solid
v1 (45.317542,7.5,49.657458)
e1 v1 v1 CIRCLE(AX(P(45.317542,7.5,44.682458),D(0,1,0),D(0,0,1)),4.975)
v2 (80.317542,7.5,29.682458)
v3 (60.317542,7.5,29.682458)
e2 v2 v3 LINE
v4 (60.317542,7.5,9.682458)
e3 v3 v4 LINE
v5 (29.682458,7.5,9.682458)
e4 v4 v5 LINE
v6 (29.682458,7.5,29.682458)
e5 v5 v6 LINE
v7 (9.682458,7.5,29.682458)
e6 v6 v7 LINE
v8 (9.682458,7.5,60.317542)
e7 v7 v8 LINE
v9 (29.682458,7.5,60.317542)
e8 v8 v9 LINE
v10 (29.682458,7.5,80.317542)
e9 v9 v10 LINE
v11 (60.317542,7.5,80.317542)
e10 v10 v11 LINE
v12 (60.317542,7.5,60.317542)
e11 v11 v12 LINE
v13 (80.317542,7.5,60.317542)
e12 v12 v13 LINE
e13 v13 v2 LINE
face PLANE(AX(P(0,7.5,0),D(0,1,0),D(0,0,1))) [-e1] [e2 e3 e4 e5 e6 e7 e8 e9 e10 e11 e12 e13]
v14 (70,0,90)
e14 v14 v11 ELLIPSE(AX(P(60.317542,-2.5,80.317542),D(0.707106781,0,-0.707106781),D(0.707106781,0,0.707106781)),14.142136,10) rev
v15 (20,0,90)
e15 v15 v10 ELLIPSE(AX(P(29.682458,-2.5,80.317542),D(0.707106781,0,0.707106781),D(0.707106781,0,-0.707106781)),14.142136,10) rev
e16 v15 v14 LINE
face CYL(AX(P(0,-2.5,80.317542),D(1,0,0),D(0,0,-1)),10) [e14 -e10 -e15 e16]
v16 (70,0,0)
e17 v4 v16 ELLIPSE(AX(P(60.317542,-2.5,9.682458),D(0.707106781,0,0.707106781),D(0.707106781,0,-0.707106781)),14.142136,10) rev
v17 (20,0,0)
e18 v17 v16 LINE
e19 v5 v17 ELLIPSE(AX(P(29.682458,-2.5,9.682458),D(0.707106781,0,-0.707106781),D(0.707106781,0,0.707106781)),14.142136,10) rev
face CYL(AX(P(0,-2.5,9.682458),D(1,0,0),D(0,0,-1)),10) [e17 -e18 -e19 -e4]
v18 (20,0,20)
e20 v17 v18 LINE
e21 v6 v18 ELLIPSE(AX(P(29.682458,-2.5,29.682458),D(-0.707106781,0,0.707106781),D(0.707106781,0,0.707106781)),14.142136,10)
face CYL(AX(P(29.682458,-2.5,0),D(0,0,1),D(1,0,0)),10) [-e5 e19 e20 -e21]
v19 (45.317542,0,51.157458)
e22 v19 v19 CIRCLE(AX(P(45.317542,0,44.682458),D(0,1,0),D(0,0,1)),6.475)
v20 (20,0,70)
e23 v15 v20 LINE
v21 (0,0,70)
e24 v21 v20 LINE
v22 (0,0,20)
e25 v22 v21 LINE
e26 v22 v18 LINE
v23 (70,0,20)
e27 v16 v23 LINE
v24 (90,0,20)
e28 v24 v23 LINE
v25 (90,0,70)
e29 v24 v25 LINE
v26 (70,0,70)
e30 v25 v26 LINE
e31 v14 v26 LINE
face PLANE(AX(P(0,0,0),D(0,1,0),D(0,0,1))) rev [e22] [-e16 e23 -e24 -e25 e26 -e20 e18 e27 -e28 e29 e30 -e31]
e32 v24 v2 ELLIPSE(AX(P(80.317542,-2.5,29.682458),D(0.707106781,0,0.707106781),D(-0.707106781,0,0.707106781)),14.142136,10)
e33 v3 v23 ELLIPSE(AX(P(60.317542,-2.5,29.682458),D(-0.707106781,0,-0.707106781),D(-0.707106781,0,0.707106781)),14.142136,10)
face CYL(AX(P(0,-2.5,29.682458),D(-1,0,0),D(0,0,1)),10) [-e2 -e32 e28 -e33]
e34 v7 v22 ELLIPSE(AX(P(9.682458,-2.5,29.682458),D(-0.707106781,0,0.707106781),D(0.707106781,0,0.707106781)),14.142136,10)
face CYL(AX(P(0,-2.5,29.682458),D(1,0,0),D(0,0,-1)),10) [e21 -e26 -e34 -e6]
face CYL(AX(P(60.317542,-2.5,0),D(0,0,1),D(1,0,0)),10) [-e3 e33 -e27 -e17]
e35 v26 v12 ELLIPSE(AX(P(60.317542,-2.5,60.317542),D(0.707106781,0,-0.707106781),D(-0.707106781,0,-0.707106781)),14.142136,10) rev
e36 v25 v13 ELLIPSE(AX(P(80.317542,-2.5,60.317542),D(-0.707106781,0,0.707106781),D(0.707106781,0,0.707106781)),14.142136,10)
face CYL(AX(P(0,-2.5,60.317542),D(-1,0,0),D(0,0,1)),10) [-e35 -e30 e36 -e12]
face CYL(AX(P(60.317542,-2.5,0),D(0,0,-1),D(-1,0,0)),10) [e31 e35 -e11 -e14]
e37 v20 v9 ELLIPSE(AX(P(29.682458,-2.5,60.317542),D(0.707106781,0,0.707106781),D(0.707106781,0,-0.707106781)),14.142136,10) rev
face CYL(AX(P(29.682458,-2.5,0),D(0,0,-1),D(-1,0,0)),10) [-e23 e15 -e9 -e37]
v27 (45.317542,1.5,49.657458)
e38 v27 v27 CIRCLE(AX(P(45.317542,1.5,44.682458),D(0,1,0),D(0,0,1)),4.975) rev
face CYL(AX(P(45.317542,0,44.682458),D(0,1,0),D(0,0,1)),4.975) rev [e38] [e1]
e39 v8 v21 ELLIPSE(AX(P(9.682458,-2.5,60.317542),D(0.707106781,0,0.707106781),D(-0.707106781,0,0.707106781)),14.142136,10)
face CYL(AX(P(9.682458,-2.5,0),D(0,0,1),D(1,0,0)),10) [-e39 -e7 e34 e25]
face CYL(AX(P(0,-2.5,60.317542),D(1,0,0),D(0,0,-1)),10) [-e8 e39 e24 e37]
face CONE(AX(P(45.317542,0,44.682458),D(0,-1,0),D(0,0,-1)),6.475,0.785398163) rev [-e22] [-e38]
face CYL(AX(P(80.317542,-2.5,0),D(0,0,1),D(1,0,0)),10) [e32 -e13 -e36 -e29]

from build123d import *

# Parameters (mm, degrees)
BOSS_EXTRUDE1_DEPTH = 7.5
FILLET1_R           = 10
SKETCH2_R           = 4.975
CUT_EXTRUDE1_DEPTH  = 7.5
CHAMFER1_SIZE       = 1.5


with BuildPart() as part:
    # Sketch1 → Boss-Extrude1 (new body)
    with BuildSketch(Plane(origin=(0, 0, 0), x_dir=(1, 0, 0), z_dir=(0, 1, 0))):
        Polygon((70, 0), (20, 0), (20, -20), (0, -20), (0, -70), (20, -70), (20, -90), (70, -90), (70, -70), (90, -70), (90, -20), (70, -20), align=None)
    extrude(amount=BOSS_EXTRUDE1_DEPTH)

    # Fillet1
    # the kernel refuses this fillet: 10 mm, written as the material it takes off along each edge
    with BuildSketch(Plane(origin=(-24.206145914, 7.5, 70), x_dir=(0, -1, 0), z_dir=(1, 0, 0)), Plane(origin=(20, 7.5, 70), x_dir=(0, -1, 0), z_dir=(0, 0, 1)), Plane(origin=(70, 7.5, 114.206145914), x_dir=(0, -1, 0), z_dir=(0, 0, -1)), Plane(origin=(70, 7.5, 70), x_dir=(0, -1, 0), z_dir=(1, 0, 0)), Plane(origin=(114.206145914, 7.5, 20), x_dir=(0, -1, 0), z_dir=(-1, 0, 0)), Plane(origin=(70, 7.5, 20), x_dir=(0, -1, 0), z_dir=(0, 0, -1)), Plane(origin=(20, 7.5, -24.206145914), x_dir=(0, -1, 0), z_dir=(0, 0, 1)), Plane(origin=(20, 7.5, 20), x_dir=(0, -1, 0), z_dir=(-1, 0, 0))) as fillet1_piece_1:
        with BuildLine():
            CenterArc((10, 9.682458366), FILLET1_R, 180, 75.522487814)
            Line((0, 9.682458366), (-0.2, 9.682458366))
            Line((-0.2, 9.682458366), (-0.2, 0))
            Line((-0.2, 0), (0, -0.2))
            ThreePointArc((0, -0.2), (3.75, -0.2), (7.45, -0.193649167))
            Line((7.45, -0.193649167), (7.5, 0))
        make_face()
    extrude(amount=44.206145914, mode=Mode.SUBTRACT)
    with BuildSketch(Plane(origin=(-4.206145914, 7.5, 90), x_dir=(0, -1, 0), z_dir=(1, 0, 0)), Plane(origin=(90, 7.5, 94.206145914), x_dir=(0, -1, 0), z_dir=(0, 0, -1)), Plane(origin=(94.206145914, 7.5, 0), x_dir=(0, -1, 0), z_dir=(-1, 0, 0)), Plane(origin=(0, 7.5, -4.206145914), x_dir=(0, -1, 0), z_dir=(0, 0, 1))) as fillet1_piece_2:
        with BuildLine():
            CenterArc((10, 9.682458366), FILLET1_R, 180, 75.522487814)
            Line((0, 9.682458366), (-0.2, 9.682458366))
            Line((-0.2, 9.682458366), (-0.2, 0))
            Line((-0.2, 0), (0, -0.2))
            ThreePointArc((0, -0.2), (3.75, -0.2), (7.45, -0.193649167))
            Line((7.45, -0.193649167), (7.5, 0))
        make_face()
    extrude(amount=98.412291828, mode=Mode.SUBTRACT)
    with BuildSketch(Plane(origin=(-24.206145914, 7.5, 70), x_dir=(0, -1, 0), z_dir=(1, 0, 0))) as fillet1_piece_3a_section:
        with BuildLine():
            CenterArc((10, 9.682458366), FILLET1_R, 180, 75.522487814)
            Line((0, 9.682458366), (-0.2, 9.682458366))
            Line((-0.2, 9.682458366), (-0.2, 0))
            Line((-0.2, 0), (0, -0.2))
            ThreePointArc((0, -0.2), (3.75, -0.2), (7.45, -0.193649167))
            Line((7.45, -0.193649167), (7.5, 0))
        make_face()
    fillet1_piece_3a = extrude(amount=68.412291828, mode=Mode.PRIVATE)
    fillet1_piece_3a = split(fillet1_piece_3a, bisect_by=Plane(origin=(20, 5.604082443, 67.718558992), z_dir=(1, 0, 0)), keep=Keep.TOP, mode=Mode.PRIVATE)
    with BuildSketch(Plane(origin=(20, 7.5, 45.793854086), x_dir=(0, -1, 0), z_dir=(0, 0, 1))) as fillet1_piece_3b_section:
        with BuildLine():
            CenterArc((10, 9.682458366), FILLET1_R, 180, 75.522487814)
            Line((0, 9.682458366), (-0.2, 9.682458366))
            Line((-0.2, 9.682458366), (-0.2, 0))
            Line((-0.2, 0), (0, -0.2))
            ThreePointArc((0, -0.2), (3.75, -0.2), (7.45, -0.193649167))
            Line((7.45, -0.193649167), (7.5, 0))
        make_face()
    fillet1_piece_3b = extrude(amount=68.412291828, mode=Mode.PRIVATE)
    fillet1_piece_3b = split(fillet1_piece_3b, bisect_by=Plane(origin=(22.281441008, 5.604082443, 70), z_dir=(0, 0, -1)), keep=Keep.TOP, mode=Mode.PRIVATE)
    fillet1_piece_3 = fillet1_piece_3a & fillet1_piece_3b
    add(fillet1_piece_3, mode=Mode.SUBTRACT)
    with BuildSketch(Plane(origin=(70, 7.5, 114.206145914), x_dir=(0, -1, 0), z_dir=(0, 0, -1))) as fillet1_piece_4a_section:
        with BuildLine():
            CenterArc((10, 9.682458366), FILLET1_R, 180, 75.522487814)
            Line((0, 9.682458366), (-0.2, 9.682458366))
            Line((-0.2, 9.682458366), (-0.2, 0))
            Line((-0.2, 0), (0, -0.2))
            ThreePointArc((0, -0.2), (3.75, -0.2), (7.45, -0.193649167))
            Line((7.45, -0.193649167), (7.5, 0))
        make_face()
    fillet1_piece_4a = extrude(amount=68.412291828, mode=Mode.PRIVATE)
    fillet1_piece_4a = split(fillet1_piece_4a, bisect_by=Plane(origin=(67.718558992, 5.604082443, 70), z_dir=(0, 0, -1)), keep=Keep.TOP, mode=Mode.PRIVATE)
    with BuildSketch(Plane(origin=(45.793854086, 7.5, 70), x_dir=(0, -1, 0), z_dir=(1, 0, 0))) as fillet1_piece_4b_section:
        with BuildLine():
            CenterArc((10, 9.682458366), FILLET1_R, 180, 75.522487814)
            Line((0, 9.682458366), (-0.2, 9.682458366))
            Line((-0.2, 9.682458366), (-0.2, 0))
            Line((-0.2, 0), (0, -0.2))
            ThreePointArc((0, -0.2), (3.75, -0.2), (7.45, -0.193649167))
            Line((7.45, -0.193649167), (7.5, 0))
        make_face()
    fillet1_piece_4b = extrude(amount=68.412291828, mode=Mode.PRIVATE)
    fillet1_piece_4b = split(fillet1_piece_4b, bisect_by=Plane(origin=(70, 5.604082443, 67.718558992), z_dir=(-1, 0, 0)), keep=Keep.TOP, mode=Mode.PRIVATE)
    fillet1_piece_4 = fillet1_piece_4a & fillet1_piece_4b
    add(fillet1_piece_4, mode=Mode.SUBTRACT)
    with BuildSketch(Plane(origin=(114.206145914, 7.5, 20), x_dir=(0, -1, 0), z_dir=(-1, 0, 0))) as fillet1_piece_5a_section:
        with BuildLine():
            CenterArc((10, 9.682458366), FILLET1_R, 180, 75.522487814)
            Line((0, 9.682458366), (-0.2, 9.682458366))
            Line((-0.2, 9.682458366), (-0.2, 0))
            Line((-0.2, 0), (0, -0.2))
            ThreePointArc((0, -0.2), (3.75, -0.2), (7.45, -0.193649167))
            Line((7.45, -0.193649167), (7.5, 0))
        make_face()
    fillet1_piece_5a = extrude(amount=68.412291828, mode=Mode.PRIVATE)
    fillet1_piece_5a = split(fillet1_piece_5a, bisect_by=Plane(origin=(70, 5.604082443, 22.281441008), z_dir=(-1, 0, 0)), keep=Keep.TOP, mode=Mode.PRIVATE)
    with BuildSketch(Plane(origin=(70, 7.5, 44.206145914), x_dir=(0, -1, 0), z_dir=(0, 0, -1))) as fillet1_piece_5b_section:
        with BuildLine():
            CenterArc((10, 9.682458366), FILLET1_R, 180, 75.522487814)
            Line((0, 9.682458366), (-0.2, 9.682458366))
            Line((-0.2, 9.682458366), (-0.2, 0))
            Line((-0.2, 0), (0, -0.2))
            ThreePointArc((0, -0.2), (3.75, -0.2), (7.45, -0.193649167))
            Line((7.45, -0.193649167), (7.5, 0))
        make_face()
    fillet1_piece_5b = extrude(amount=68.412291828, mode=Mode.PRIVATE)
    fillet1_piece_5b = split(fillet1_piece_5b, bisect_by=Plane(origin=(67.718558992, 5.604082443, 20), z_dir=(0, 0, 1)), keep=Keep.TOP, mode=Mode.PRIVATE)
    fillet1_piece_5 = fillet1_piece_5a & fillet1_piece_5b
    add(fillet1_piece_5, mode=Mode.SUBTRACT)
    with BuildSketch(Plane(origin=(20, 7.5, -24.206145914), x_dir=(0, -1, 0), z_dir=(0, 0, 1))) as fillet1_piece_6a_section:
        with BuildLine():
            CenterArc((10, 9.682458366), FILLET1_R, 180, 75.522487814)
            Line((0, 9.682458366), (-0.2, 9.682458366))
            Line((-0.2, 9.682458366), (-0.2, 0))
            Line((-0.2, 0), (0, -0.2))
            ThreePointArc((0, -0.2), (3.75, -0.2), (7.45, -0.193649167))
            Line((7.45, -0.193649167), (7.5, 0))
        make_face()
    fillet1_piece_6a = extrude(amount=68.412291828, mode=Mode.PRIVATE)
    fillet1_piece_6a = split(fillet1_piece_6a, bisect_by=Plane(origin=(22.281441008, 5.604082443, 20), z_dir=(0, 0, 1)), keep=Keep.TOP, mode=Mode.PRIVATE)
    with BuildSketch(Plane(origin=(44.206145914, 7.5, 20), x_dir=(0, -1, 0), z_dir=(-1, 0, 0))) as fillet1_piece_6b_section:
        with BuildLine():
            CenterArc((10, 9.682458366), FILLET1_R, 180, 75.522487814)
            Line((0, 9.682458366), (-0.2, 9.682458366))
            Line((-0.2, 9.682458366), (-0.2, 0))
            Line((-0.2, 0), (0, -0.2))
            ThreePointArc((0, -0.2), (3.75, -0.2), (7.45, -0.193649167))
            Line((7.45, -0.193649167), (7.5, 0))
        make_face()
    fillet1_piece_6b = extrude(amount=68.412291828, mode=Mode.PRIVATE)
    fillet1_piece_6b = split(fillet1_piece_6b, bisect_by=Plane(origin=(20, 5.604082443, 22.281441008), z_dir=(1, 0, 0)), keep=Keep.TOP, mode=Mode.PRIVATE)
    fillet1_piece_6 = fillet1_piece_6a & fillet1_piece_6b
    add(fillet1_piece_6, mode=Mode.SUBTRACT)

    # Sketch2 → Cut-Extrude1 (cut)
    with BuildSketch(Plane(origin=(0, 7.5, 0), x_dir=(1, 0, 0), z_dir=(0, 1, 0))):
        with Locations(Location((45.317541634, -44.682458366, 0), (0, 0, 270))):
            Circle(SKETCH2_R)
    extrude(amount=-CUT_EXTRUDE1_DEPTH, mode=Mode.SUBTRACT)

    # Chamfer1
    chamfer1_edges = [part.edges().sort_by_distance(p)[0] for p in [
        (45.317541634, 0, 39.707458366),
    ]]
    chamfer(chamfer1_edges, length=CHAMFER1_SIZE)


solid = part.part
